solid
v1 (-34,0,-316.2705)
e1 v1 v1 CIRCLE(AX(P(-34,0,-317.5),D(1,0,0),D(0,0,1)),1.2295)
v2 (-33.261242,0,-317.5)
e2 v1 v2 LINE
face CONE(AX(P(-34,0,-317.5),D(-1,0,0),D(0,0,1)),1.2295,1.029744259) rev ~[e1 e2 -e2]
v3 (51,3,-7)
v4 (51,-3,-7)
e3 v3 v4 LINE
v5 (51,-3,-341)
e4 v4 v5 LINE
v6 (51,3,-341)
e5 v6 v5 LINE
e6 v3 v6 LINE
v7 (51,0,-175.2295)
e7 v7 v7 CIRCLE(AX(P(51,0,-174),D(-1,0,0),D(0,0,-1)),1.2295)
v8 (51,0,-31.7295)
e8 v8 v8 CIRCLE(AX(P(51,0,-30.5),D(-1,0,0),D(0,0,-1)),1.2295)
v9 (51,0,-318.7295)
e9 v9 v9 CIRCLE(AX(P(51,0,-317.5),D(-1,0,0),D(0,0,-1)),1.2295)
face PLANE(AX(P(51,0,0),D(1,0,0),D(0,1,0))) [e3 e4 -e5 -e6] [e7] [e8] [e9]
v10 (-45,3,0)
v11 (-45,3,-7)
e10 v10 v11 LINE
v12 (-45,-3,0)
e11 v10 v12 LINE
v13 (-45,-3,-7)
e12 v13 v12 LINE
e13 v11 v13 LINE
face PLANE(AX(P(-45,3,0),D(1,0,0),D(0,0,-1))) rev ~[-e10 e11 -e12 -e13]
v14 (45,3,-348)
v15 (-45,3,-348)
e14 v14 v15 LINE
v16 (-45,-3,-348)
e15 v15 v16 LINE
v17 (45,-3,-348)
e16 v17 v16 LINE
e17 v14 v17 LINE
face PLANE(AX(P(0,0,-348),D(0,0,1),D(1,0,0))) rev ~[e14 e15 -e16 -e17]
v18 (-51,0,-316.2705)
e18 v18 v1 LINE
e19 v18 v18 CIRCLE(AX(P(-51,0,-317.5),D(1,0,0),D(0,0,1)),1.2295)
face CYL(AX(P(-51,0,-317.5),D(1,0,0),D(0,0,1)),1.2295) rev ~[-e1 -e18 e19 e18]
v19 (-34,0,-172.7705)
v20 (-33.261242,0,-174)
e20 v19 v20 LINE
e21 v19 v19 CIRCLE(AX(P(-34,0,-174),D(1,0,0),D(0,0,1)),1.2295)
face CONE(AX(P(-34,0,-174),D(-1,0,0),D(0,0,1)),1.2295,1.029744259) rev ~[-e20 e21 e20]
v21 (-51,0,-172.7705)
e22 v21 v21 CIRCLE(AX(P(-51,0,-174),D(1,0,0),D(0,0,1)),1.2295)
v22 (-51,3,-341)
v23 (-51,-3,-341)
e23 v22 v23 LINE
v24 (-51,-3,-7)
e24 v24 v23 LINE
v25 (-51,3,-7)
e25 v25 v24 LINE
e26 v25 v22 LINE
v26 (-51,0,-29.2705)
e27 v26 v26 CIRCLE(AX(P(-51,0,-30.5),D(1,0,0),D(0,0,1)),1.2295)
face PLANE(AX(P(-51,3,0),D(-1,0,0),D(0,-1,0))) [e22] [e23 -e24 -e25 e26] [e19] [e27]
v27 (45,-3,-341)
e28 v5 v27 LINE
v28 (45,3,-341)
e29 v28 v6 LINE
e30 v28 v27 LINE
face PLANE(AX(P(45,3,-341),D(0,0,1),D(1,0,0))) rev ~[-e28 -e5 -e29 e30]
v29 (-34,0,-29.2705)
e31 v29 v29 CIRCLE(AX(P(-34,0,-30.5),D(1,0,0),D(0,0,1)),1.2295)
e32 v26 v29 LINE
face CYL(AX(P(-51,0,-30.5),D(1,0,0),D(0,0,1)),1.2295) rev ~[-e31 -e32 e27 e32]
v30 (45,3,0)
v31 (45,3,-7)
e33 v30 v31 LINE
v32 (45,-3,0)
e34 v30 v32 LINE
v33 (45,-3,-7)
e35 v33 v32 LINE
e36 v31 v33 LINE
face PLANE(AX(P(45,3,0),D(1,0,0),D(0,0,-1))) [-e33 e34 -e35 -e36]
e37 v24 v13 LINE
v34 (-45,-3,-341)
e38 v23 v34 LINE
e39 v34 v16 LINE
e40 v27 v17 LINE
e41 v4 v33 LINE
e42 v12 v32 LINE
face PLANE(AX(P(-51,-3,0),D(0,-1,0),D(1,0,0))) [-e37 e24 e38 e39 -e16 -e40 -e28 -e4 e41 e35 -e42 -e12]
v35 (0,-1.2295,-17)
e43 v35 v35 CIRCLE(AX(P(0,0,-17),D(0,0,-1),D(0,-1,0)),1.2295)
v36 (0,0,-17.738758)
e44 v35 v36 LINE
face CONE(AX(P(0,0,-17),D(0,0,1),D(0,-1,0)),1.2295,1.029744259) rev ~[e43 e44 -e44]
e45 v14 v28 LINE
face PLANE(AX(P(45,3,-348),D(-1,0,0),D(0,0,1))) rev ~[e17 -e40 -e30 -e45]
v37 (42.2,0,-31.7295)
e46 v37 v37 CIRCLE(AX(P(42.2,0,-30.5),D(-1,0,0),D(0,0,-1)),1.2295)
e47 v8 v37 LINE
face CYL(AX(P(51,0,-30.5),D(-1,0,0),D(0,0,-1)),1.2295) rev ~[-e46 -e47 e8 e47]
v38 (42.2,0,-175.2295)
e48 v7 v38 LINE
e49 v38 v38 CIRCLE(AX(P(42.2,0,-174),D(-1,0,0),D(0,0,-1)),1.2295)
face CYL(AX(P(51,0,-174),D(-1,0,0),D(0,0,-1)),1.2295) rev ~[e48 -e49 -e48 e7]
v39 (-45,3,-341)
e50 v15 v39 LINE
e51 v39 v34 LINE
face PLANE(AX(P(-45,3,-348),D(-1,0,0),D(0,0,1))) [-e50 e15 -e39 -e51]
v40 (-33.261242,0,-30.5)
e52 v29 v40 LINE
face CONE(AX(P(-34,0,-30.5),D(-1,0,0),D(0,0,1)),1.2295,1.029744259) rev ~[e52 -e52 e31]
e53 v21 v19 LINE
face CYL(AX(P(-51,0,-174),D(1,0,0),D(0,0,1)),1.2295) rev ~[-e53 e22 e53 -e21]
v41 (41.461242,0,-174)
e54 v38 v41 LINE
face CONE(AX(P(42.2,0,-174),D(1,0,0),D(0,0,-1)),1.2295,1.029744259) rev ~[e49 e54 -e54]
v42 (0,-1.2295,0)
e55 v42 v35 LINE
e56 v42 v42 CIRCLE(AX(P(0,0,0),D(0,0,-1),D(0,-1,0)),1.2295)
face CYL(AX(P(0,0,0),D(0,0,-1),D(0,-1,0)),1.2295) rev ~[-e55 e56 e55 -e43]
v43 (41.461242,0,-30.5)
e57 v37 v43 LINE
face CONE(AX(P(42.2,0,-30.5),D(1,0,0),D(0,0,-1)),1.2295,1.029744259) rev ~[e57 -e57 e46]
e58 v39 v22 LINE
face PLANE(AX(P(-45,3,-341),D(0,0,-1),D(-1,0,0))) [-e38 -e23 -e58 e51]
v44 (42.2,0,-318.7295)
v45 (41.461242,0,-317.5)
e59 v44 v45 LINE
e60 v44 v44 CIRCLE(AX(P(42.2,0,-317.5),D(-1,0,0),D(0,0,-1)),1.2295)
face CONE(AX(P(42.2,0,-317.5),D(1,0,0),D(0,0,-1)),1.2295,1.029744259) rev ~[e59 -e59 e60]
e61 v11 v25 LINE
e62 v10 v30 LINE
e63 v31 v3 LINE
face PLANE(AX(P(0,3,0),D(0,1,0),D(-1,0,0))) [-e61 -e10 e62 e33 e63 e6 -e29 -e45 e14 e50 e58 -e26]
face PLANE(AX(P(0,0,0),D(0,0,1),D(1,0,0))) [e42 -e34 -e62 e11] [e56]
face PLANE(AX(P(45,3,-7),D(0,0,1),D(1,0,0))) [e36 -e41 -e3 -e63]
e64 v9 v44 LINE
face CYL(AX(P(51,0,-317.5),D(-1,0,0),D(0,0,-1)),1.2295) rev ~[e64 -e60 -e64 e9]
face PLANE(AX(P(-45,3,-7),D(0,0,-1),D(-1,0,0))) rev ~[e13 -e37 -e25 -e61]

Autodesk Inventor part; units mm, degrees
ref_plane "YZ Plane" through (0, 0, 0) normal (1, 0, 0) x (0, 1, 0)
ref_plane "XZ Plane" through (0, 0, 0) normal (0, 1, 0) x (-1, 0, 0)
ref_plane "XY Plane" through (0, 0, 0) normal (0, 0, 1) x (1, 0, 0)
sketch "Skizze1" plane through (0, 0, 0) normal (0, 0, 1) x (1, 0, 0)
  line L0 (-71.4, 0) -> (71.4, 0) projected
  line L1 (0, -4.2) -> (0, 4.2) projected
  line L2 (-51, -3) -> (51, -3)
  line L3 (51, -3) -> (51, 3)
  line L4 (51, 3) -> (-51, 3)
  line L5 (-51, 3) -> (-51, -3)
  line L6 (-51, -3) -> (51, 3) construction
  line L7 (51, -3) -> (-51, 3) construction
  point P0 (0, 0)
  dimension "d0" = 102
  dimension "d1" = 6
extrude "Extrusion1" add sketch "Skizze1" against normal blind 348
sketch "Skizze2" plane through (-51, 3, 0) normal (0, 1, 0) x (1, 0, 0)
  line L0 (102, 0) -> (0, 0) projected
  line L1 (102, 0) -> (102, 348) projected
  line L2 (0, 348) -> (102, 348) projected
  line L3 (0, 0) -> (0, 348) projected
  line L4 (-20.4, 0) -> (122.4, 0) projected
  line L5 (51, 417.6) -> (51, -69.6) projected
  line L6 (0, 0) -> (102, 0) projected
  line L7 (0, 0) -> (6, 0)
  line L8 (6, 0) -> (6, 7)
  line L9 (6, 7) -> (0, 7)
  line L10 (0, 7) -> (0, 0)
  line L11 (102, 0) -> (96, 0)
  line L12 (96, 0) -> (96, 7)
  line L13 (96, 7) -> (102, 7)
  line L14 (102, 7) -> (102, 0)
  line L15 (102, 0) -> (102, 348) projected
  line L16 (102, 348) -> (96, 348)
  line L17 (96, 348) -> (96, 341)
  line L18 (96, 341) -> (102, 341)
  line L19 (102, 341) -> (102, 348)
  line L20 (102, 348) -> (0, 348) projected
  line L21 (0, 348) -> (6, 348)
  line L22 (6, 348) -> (6, 341)
  line L23 (6, 341) -> (0, 341)
  line L24 (0, 341) -> (0, 348)
  point P0 (51, 0)
  point P1 (0, 7)
  point P2 (6, 0)
  dimension "d4" = 6
  dimension "d5" = 7
  dimension "d6" = 6
  dimension "d7" = 7
  dimension "d8" = 6
extrude "Extrusion2" cut sketch "Skizze2" against normal blind 348 contours L0 L12 L13 L1 | L18 L17 L2 L1 | L0 L3 L9 L8 | L22 L23 L3 L2
sketch "Skizze3" plane through (51, 3, -7) normal (1, 0, 0) x (0, 0, -1)
  line L0 (334, -6) -> (334, 0) projected
  line L1 (0, 0) -> (334, 0) projected
  line L2 (0, 0) -> (0, -6) projected
  line L3 (0, -6) -> (334, -6) projected
  point P0 (-7, -3)
  point P1 (23.5, -3)
  point P2 (167, -3)
  point P3 (310.5, -3)
  dimension "d11" = 23.5
  dimension "d12" = 23.5
  dimension "d13" = 167
hole "Bohrung1" at (51, 0, -30.5) at (51, 0, -174) at (51, 0, -317.5) direction (-1, 0, 0) diameter 2.459 depth 8.8 tip angle 118 thread size "M3x0.5" class "6H" standard "ANSI Metric M Profile"
sketch "Skizze4" plane through (0, 0, 0) normal (0, 0, 1) x (1, 0, 0)
  line L0 (-45, 3) -> (-45, -3) projected
  line L1 (-45, -3) -> (45, -3) projected
  line L2 (45, -3) -> (45, 3) projected
  line L3 (45, 3) -> (-45, 3) projected
  line L4 (-71.4, 0) -> (71.4, 0) projected
  line L5 (0, -4.2) -> (0, 4.2) projected
  point P0 (0, 0)
  point P1 (0, 0)
hole "Bohrung2" at (0, 0, 0) direction (0, 0, -1) diameter 2.459 depth 17 tip angle 118 thread size "M3x0.5" class "6H" standard "ANSI Metric M Profile"
sketch "Skizze5" plane through (-51, 3, -341) normal (-1, 0, 0) x (0, 0, 1)
  line L0 (334, -6) -> (334, 0) projected
  line L1 (334, 0) -> (0, 0) projected
  line L2 (0, 0) -> (0, -6) projected
  line L3 (334, -6) -> (0, -6) projected
  circle A0 centre (310.5, -3) radius 1.2295 projected
  circle A1 centre (167, -3) radius 1.2295 projected
  circle A2 centre (23.5, -3) radius 1.2295 projected
  line L4 (341, -7.2) -> (341, 1.2) projected
  line L5 (-76.6, -3) -> (410.6, -3) projected
  circle A3 centre (23.5, -3) radius 1.2295 projected
  point P0 (341, -3)
hole "Bohrung3" at (-51, 0, -317.5) at (-51, 0, -174) at (-51, 0, -30.5) direction (1, 0, 0) diameter 2.459 depth 17 tip angle 118 thread size "M3x0.5" class "6H" standard "ANSI Metric M Profile"
properties part number "I Bodenplatte" material "PVC, hart"
